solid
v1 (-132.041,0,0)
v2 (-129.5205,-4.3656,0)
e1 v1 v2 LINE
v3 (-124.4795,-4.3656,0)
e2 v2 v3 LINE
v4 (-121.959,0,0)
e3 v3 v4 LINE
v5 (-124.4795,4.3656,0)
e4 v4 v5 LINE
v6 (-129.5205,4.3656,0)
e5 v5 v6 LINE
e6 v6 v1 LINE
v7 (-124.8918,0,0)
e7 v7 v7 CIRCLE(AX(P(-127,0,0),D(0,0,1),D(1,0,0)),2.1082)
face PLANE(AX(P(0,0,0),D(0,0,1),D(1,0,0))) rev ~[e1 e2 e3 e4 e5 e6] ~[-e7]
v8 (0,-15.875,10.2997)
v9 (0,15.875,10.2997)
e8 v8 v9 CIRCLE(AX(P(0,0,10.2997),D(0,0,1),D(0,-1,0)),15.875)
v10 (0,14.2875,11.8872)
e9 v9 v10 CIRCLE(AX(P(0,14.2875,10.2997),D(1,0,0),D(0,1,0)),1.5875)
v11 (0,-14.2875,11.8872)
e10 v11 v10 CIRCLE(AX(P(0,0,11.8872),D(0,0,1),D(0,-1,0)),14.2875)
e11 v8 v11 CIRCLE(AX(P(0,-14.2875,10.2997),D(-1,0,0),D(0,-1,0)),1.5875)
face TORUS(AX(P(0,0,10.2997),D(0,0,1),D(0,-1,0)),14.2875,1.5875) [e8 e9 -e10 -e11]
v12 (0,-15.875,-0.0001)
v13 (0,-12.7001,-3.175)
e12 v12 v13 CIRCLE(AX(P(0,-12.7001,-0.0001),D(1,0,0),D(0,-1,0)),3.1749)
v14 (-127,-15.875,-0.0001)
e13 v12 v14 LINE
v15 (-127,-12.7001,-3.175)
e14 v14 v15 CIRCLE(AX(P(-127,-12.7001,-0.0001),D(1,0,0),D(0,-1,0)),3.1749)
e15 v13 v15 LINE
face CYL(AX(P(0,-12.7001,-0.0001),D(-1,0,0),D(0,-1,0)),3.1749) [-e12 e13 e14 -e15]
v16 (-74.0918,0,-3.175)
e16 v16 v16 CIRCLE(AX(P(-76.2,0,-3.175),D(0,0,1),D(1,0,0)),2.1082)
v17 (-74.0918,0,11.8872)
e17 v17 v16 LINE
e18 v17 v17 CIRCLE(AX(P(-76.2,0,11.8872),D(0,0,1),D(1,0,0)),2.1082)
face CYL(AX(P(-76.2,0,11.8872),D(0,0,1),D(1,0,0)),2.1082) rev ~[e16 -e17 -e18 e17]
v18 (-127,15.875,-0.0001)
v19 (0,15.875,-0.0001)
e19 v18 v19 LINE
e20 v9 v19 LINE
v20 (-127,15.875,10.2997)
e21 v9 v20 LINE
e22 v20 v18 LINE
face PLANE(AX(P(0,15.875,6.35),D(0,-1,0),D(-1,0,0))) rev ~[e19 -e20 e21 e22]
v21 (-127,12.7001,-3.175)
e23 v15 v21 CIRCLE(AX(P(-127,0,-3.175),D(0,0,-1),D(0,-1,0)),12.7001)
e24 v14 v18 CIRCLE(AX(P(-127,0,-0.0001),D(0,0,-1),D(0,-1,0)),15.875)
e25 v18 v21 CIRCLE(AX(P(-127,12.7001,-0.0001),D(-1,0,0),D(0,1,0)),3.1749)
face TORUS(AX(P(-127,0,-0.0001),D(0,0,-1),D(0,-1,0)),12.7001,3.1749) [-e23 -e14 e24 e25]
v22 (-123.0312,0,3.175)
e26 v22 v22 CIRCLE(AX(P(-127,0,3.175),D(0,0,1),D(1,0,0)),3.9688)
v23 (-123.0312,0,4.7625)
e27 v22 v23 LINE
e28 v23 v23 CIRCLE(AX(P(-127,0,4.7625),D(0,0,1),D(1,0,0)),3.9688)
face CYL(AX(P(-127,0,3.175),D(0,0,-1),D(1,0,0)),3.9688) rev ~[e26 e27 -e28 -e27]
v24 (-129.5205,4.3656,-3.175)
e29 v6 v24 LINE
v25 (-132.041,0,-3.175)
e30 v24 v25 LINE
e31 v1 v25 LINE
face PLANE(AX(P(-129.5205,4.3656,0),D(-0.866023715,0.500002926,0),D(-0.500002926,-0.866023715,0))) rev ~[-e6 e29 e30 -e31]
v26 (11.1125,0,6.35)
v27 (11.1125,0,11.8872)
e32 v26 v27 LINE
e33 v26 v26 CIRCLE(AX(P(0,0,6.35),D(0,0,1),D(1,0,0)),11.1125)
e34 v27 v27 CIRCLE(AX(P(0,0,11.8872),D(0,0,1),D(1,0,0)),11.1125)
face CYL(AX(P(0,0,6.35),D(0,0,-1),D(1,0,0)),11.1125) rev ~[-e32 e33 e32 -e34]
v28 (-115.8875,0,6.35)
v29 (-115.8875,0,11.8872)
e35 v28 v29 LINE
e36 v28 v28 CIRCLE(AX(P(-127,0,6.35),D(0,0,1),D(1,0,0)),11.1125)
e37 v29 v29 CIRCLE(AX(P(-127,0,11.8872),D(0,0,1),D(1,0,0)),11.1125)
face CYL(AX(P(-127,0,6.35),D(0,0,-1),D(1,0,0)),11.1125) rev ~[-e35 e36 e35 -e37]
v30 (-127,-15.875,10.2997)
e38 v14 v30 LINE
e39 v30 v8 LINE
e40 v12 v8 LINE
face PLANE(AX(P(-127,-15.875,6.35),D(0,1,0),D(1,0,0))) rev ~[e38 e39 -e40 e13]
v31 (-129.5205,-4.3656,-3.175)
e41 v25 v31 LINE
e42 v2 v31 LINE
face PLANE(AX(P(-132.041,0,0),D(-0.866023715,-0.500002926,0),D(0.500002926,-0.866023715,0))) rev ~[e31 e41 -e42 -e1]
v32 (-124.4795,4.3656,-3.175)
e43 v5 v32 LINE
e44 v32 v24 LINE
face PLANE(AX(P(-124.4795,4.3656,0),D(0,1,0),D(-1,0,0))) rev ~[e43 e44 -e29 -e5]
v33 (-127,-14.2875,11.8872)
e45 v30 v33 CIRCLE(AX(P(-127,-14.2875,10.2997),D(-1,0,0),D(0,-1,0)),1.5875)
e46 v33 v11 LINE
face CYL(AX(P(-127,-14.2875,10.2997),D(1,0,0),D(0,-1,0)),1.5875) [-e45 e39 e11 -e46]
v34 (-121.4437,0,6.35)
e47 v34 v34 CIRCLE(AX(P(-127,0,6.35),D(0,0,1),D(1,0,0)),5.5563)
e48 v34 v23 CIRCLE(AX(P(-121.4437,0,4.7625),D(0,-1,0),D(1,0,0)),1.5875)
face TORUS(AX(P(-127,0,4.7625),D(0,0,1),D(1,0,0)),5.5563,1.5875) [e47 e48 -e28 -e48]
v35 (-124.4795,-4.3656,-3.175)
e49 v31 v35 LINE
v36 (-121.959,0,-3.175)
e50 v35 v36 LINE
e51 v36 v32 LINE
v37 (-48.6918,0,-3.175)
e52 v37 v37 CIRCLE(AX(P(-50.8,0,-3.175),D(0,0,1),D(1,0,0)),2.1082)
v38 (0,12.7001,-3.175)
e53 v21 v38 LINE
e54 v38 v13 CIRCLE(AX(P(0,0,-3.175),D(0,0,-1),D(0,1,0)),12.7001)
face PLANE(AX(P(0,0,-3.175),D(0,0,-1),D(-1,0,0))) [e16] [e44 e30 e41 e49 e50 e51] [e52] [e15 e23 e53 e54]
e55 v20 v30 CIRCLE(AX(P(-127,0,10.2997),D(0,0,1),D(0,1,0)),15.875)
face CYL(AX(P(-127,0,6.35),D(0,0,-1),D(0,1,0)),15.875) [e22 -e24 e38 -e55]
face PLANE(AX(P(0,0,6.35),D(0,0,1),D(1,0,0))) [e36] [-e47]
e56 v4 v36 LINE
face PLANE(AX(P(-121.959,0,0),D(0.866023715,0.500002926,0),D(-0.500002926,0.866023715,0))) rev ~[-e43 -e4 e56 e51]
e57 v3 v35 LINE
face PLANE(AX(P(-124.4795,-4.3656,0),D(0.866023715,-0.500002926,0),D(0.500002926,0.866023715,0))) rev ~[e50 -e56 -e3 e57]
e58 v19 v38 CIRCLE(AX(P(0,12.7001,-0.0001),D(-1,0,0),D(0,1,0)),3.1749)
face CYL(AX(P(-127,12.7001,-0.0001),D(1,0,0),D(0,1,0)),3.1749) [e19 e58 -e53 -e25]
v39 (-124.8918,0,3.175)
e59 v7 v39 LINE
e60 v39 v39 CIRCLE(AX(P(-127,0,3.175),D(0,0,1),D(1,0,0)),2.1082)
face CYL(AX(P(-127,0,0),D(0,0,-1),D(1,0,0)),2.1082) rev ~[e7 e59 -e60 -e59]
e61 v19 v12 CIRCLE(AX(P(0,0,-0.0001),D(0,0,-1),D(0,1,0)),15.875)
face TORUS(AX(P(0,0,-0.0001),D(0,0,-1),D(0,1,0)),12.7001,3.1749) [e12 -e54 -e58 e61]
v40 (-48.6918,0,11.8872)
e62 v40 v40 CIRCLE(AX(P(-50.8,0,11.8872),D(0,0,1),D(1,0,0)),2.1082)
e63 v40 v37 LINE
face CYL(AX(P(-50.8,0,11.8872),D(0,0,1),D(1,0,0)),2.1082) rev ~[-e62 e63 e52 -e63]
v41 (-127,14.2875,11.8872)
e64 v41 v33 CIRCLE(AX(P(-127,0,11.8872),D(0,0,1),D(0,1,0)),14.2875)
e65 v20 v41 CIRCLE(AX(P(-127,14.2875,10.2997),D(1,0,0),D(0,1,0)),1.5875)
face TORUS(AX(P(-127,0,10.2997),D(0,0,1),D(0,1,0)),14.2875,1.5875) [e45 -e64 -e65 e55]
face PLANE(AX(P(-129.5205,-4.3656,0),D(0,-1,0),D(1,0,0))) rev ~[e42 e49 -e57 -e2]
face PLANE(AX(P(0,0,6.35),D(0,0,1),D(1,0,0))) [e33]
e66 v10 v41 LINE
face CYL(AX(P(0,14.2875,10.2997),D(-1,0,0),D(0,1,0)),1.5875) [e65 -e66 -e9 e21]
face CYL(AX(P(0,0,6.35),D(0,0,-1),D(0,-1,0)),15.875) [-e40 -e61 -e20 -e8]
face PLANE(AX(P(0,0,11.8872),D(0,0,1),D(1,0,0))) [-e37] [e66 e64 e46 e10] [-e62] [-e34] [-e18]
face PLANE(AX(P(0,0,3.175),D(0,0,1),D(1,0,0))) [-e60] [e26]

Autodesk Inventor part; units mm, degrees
ref_plane "YZ Plane" through (0, 0, 0) normal (1, 0, 0) x (0, 1, 0)
ref_plane "XZ Plane" through (0, 0, 0) normal (0, 1, 0) x (-1, 0, 0)
ref_plane "XY Plane" through (0, 0, 0) normal (0, 0, 1) x (1, 0, 0)
sketch "Sketch1" plane through (0, 0, 0) normal (0, 0, 1) x (1, 0, 0)
  circle A0 centre (0, 0) radius 15.875
  line L0 (0, 0) -> (-127, 0)
  circle A1 centre (-127, 0) radius 15.875
  line L1 (-127, 15.875) -> (0, 15.875)
  line L2 (0, -15.875) -> (-127, -15.875)
  circle A2 centre (-127, 0) radius 2.1082
  dimension "d0" = 31.75
  dimension "d1" = 127
  dimension "d2" = 31.75
  dimension "d3" = 4.2164
extrude "Extrusion1" add sketch "Sketch1" along normal blind 3.175
sketch "Sketch2" plane through (0, 0, 0) normal (0, 0, -1) x (-1, 0, 0)
  arc A0 (127, -15.875) -> (127, 15.875) centre (127, 0) ccw projected
  line L0 (0, 15.875) -> (127, 15.875) projected
  arc A1 (0, 15.875) -> (0, -15.875) centre (0, 0) ccw projected
  line L1 (127, -15.875) -> (0, -15.875) projected
  circle A2 centre (127, 0) radius 2.1082 projected
  line L2 (121.959, 0) -> (124.4795, 4.3656)
  line L3 (124.4795, 4.3656) -> (129.5205, 4.3656)
  line L4 (129.5205, 4.3656) -> (132.041, 0)
  line L5 (132.041, 0) -> (129.5205, -4.3656)
  line L6 (129.5205, -4.3656) -> (124.4795, -4.3656)
  line L7 (124.4795, -4.3656) -> (121.959, 0)
  dimension "d6" = 4.3656
extrude "Extrusion2" add sketch "Sketch2" along normal blind 3.175 contours L1 A1 L0 A0
fillet "Fillet1" radius 3.175 4 edges at (15.875, 0, -3.175) (-63.5, -15.875, -3.175) (-142.875, 0, -3.175) (-63.5, 15.875, -3.175)
sketch "Sketch3" plane through (0, 0, 3.175) normal (0, 0, 1) x (1, 0, 0)
  arc A0 (-127, 15.875) -> (-127, -15.875) centre (-127, 0) ccw projected
  line L0 (-127, -15.875) -> (0, -15.875) projected
  arc A1 (0, -15.875) -> (0, 15.875) centre (0, 0) ccw projected
  line L1 (0, 15.875) -> (-127, 15.875) projected
  circle A2 centre (-127, 0) radius 2.1082 projected
  circle A3 centre (-127, 0) radius 3.9688
  dimension "d10" = 7.9375
extrude "Extrusion3" add sketch "Sketch3" along normal blind 3.175 contours L1 A1 L0 A0
sketch "Sketch4" plane through (0, 0, 6.35) normal (0, 0, 1) x (1, 0, 0)
  line L0 (-127, -15.875) -> (0, -15.875) projected
  arc A0 (0, -15.875) -> (0, 15.875) centre (0, 0) ccw projected
  line L1 (0, 15.875) -> (-127, 15.875) projected
  arc A1 (-127, 15.875) -> (-127, -15.875) centre (-127, 0) ccw projected
  circle A2 centre (-127, 0) radius 3.9688 projected
  circle A3 centre (-127, 0) radius 2.1082 projected
  circle A4 centre (-127, 0) radius 11.1125
  circle A5 centre (0, 0) radius 11.1125
  dimension "d13" = 22.225
  dimension "d14" = 22.225
extrude "Extrusion4" add sketch "Sketch4" along normal blind 5.5372 contours A1 L1 A0 L0
sketch "Sketch5" plane through (0, 0, 11.8872) normal (0, 0, 1) x (1, 0, 0)
  circle A0 centre (-76.2, 0) radius 2.1082
  circle A1 centre (-50.8, 0) radius 2.1082
  circle A2 centre (-127, 0) radius 2.1082 projected
  point P0 (0, 0)
  dimension "d17" = 4.2164
  dimension "d18" = 4.2164
  dimension "d19" = 50.8
  dimension "d20" = 50.8
extrude "Extrusion5" cut sketch "Sketch5" against normal blind 25.4 contours A0 | A1
fillet "Fillet2" radius 1.5875 4 edges at (-142.875, 0, 11.8872) (-63.5, -15.875, 11.8872) (15.875, 0, 11.8872) (-63.5, 15.875, 11.8872)
fillet "Fillet3" radius 1.5875 1 edges at (-130.9688, 0, 6.35)
properties part number "Plate E"
